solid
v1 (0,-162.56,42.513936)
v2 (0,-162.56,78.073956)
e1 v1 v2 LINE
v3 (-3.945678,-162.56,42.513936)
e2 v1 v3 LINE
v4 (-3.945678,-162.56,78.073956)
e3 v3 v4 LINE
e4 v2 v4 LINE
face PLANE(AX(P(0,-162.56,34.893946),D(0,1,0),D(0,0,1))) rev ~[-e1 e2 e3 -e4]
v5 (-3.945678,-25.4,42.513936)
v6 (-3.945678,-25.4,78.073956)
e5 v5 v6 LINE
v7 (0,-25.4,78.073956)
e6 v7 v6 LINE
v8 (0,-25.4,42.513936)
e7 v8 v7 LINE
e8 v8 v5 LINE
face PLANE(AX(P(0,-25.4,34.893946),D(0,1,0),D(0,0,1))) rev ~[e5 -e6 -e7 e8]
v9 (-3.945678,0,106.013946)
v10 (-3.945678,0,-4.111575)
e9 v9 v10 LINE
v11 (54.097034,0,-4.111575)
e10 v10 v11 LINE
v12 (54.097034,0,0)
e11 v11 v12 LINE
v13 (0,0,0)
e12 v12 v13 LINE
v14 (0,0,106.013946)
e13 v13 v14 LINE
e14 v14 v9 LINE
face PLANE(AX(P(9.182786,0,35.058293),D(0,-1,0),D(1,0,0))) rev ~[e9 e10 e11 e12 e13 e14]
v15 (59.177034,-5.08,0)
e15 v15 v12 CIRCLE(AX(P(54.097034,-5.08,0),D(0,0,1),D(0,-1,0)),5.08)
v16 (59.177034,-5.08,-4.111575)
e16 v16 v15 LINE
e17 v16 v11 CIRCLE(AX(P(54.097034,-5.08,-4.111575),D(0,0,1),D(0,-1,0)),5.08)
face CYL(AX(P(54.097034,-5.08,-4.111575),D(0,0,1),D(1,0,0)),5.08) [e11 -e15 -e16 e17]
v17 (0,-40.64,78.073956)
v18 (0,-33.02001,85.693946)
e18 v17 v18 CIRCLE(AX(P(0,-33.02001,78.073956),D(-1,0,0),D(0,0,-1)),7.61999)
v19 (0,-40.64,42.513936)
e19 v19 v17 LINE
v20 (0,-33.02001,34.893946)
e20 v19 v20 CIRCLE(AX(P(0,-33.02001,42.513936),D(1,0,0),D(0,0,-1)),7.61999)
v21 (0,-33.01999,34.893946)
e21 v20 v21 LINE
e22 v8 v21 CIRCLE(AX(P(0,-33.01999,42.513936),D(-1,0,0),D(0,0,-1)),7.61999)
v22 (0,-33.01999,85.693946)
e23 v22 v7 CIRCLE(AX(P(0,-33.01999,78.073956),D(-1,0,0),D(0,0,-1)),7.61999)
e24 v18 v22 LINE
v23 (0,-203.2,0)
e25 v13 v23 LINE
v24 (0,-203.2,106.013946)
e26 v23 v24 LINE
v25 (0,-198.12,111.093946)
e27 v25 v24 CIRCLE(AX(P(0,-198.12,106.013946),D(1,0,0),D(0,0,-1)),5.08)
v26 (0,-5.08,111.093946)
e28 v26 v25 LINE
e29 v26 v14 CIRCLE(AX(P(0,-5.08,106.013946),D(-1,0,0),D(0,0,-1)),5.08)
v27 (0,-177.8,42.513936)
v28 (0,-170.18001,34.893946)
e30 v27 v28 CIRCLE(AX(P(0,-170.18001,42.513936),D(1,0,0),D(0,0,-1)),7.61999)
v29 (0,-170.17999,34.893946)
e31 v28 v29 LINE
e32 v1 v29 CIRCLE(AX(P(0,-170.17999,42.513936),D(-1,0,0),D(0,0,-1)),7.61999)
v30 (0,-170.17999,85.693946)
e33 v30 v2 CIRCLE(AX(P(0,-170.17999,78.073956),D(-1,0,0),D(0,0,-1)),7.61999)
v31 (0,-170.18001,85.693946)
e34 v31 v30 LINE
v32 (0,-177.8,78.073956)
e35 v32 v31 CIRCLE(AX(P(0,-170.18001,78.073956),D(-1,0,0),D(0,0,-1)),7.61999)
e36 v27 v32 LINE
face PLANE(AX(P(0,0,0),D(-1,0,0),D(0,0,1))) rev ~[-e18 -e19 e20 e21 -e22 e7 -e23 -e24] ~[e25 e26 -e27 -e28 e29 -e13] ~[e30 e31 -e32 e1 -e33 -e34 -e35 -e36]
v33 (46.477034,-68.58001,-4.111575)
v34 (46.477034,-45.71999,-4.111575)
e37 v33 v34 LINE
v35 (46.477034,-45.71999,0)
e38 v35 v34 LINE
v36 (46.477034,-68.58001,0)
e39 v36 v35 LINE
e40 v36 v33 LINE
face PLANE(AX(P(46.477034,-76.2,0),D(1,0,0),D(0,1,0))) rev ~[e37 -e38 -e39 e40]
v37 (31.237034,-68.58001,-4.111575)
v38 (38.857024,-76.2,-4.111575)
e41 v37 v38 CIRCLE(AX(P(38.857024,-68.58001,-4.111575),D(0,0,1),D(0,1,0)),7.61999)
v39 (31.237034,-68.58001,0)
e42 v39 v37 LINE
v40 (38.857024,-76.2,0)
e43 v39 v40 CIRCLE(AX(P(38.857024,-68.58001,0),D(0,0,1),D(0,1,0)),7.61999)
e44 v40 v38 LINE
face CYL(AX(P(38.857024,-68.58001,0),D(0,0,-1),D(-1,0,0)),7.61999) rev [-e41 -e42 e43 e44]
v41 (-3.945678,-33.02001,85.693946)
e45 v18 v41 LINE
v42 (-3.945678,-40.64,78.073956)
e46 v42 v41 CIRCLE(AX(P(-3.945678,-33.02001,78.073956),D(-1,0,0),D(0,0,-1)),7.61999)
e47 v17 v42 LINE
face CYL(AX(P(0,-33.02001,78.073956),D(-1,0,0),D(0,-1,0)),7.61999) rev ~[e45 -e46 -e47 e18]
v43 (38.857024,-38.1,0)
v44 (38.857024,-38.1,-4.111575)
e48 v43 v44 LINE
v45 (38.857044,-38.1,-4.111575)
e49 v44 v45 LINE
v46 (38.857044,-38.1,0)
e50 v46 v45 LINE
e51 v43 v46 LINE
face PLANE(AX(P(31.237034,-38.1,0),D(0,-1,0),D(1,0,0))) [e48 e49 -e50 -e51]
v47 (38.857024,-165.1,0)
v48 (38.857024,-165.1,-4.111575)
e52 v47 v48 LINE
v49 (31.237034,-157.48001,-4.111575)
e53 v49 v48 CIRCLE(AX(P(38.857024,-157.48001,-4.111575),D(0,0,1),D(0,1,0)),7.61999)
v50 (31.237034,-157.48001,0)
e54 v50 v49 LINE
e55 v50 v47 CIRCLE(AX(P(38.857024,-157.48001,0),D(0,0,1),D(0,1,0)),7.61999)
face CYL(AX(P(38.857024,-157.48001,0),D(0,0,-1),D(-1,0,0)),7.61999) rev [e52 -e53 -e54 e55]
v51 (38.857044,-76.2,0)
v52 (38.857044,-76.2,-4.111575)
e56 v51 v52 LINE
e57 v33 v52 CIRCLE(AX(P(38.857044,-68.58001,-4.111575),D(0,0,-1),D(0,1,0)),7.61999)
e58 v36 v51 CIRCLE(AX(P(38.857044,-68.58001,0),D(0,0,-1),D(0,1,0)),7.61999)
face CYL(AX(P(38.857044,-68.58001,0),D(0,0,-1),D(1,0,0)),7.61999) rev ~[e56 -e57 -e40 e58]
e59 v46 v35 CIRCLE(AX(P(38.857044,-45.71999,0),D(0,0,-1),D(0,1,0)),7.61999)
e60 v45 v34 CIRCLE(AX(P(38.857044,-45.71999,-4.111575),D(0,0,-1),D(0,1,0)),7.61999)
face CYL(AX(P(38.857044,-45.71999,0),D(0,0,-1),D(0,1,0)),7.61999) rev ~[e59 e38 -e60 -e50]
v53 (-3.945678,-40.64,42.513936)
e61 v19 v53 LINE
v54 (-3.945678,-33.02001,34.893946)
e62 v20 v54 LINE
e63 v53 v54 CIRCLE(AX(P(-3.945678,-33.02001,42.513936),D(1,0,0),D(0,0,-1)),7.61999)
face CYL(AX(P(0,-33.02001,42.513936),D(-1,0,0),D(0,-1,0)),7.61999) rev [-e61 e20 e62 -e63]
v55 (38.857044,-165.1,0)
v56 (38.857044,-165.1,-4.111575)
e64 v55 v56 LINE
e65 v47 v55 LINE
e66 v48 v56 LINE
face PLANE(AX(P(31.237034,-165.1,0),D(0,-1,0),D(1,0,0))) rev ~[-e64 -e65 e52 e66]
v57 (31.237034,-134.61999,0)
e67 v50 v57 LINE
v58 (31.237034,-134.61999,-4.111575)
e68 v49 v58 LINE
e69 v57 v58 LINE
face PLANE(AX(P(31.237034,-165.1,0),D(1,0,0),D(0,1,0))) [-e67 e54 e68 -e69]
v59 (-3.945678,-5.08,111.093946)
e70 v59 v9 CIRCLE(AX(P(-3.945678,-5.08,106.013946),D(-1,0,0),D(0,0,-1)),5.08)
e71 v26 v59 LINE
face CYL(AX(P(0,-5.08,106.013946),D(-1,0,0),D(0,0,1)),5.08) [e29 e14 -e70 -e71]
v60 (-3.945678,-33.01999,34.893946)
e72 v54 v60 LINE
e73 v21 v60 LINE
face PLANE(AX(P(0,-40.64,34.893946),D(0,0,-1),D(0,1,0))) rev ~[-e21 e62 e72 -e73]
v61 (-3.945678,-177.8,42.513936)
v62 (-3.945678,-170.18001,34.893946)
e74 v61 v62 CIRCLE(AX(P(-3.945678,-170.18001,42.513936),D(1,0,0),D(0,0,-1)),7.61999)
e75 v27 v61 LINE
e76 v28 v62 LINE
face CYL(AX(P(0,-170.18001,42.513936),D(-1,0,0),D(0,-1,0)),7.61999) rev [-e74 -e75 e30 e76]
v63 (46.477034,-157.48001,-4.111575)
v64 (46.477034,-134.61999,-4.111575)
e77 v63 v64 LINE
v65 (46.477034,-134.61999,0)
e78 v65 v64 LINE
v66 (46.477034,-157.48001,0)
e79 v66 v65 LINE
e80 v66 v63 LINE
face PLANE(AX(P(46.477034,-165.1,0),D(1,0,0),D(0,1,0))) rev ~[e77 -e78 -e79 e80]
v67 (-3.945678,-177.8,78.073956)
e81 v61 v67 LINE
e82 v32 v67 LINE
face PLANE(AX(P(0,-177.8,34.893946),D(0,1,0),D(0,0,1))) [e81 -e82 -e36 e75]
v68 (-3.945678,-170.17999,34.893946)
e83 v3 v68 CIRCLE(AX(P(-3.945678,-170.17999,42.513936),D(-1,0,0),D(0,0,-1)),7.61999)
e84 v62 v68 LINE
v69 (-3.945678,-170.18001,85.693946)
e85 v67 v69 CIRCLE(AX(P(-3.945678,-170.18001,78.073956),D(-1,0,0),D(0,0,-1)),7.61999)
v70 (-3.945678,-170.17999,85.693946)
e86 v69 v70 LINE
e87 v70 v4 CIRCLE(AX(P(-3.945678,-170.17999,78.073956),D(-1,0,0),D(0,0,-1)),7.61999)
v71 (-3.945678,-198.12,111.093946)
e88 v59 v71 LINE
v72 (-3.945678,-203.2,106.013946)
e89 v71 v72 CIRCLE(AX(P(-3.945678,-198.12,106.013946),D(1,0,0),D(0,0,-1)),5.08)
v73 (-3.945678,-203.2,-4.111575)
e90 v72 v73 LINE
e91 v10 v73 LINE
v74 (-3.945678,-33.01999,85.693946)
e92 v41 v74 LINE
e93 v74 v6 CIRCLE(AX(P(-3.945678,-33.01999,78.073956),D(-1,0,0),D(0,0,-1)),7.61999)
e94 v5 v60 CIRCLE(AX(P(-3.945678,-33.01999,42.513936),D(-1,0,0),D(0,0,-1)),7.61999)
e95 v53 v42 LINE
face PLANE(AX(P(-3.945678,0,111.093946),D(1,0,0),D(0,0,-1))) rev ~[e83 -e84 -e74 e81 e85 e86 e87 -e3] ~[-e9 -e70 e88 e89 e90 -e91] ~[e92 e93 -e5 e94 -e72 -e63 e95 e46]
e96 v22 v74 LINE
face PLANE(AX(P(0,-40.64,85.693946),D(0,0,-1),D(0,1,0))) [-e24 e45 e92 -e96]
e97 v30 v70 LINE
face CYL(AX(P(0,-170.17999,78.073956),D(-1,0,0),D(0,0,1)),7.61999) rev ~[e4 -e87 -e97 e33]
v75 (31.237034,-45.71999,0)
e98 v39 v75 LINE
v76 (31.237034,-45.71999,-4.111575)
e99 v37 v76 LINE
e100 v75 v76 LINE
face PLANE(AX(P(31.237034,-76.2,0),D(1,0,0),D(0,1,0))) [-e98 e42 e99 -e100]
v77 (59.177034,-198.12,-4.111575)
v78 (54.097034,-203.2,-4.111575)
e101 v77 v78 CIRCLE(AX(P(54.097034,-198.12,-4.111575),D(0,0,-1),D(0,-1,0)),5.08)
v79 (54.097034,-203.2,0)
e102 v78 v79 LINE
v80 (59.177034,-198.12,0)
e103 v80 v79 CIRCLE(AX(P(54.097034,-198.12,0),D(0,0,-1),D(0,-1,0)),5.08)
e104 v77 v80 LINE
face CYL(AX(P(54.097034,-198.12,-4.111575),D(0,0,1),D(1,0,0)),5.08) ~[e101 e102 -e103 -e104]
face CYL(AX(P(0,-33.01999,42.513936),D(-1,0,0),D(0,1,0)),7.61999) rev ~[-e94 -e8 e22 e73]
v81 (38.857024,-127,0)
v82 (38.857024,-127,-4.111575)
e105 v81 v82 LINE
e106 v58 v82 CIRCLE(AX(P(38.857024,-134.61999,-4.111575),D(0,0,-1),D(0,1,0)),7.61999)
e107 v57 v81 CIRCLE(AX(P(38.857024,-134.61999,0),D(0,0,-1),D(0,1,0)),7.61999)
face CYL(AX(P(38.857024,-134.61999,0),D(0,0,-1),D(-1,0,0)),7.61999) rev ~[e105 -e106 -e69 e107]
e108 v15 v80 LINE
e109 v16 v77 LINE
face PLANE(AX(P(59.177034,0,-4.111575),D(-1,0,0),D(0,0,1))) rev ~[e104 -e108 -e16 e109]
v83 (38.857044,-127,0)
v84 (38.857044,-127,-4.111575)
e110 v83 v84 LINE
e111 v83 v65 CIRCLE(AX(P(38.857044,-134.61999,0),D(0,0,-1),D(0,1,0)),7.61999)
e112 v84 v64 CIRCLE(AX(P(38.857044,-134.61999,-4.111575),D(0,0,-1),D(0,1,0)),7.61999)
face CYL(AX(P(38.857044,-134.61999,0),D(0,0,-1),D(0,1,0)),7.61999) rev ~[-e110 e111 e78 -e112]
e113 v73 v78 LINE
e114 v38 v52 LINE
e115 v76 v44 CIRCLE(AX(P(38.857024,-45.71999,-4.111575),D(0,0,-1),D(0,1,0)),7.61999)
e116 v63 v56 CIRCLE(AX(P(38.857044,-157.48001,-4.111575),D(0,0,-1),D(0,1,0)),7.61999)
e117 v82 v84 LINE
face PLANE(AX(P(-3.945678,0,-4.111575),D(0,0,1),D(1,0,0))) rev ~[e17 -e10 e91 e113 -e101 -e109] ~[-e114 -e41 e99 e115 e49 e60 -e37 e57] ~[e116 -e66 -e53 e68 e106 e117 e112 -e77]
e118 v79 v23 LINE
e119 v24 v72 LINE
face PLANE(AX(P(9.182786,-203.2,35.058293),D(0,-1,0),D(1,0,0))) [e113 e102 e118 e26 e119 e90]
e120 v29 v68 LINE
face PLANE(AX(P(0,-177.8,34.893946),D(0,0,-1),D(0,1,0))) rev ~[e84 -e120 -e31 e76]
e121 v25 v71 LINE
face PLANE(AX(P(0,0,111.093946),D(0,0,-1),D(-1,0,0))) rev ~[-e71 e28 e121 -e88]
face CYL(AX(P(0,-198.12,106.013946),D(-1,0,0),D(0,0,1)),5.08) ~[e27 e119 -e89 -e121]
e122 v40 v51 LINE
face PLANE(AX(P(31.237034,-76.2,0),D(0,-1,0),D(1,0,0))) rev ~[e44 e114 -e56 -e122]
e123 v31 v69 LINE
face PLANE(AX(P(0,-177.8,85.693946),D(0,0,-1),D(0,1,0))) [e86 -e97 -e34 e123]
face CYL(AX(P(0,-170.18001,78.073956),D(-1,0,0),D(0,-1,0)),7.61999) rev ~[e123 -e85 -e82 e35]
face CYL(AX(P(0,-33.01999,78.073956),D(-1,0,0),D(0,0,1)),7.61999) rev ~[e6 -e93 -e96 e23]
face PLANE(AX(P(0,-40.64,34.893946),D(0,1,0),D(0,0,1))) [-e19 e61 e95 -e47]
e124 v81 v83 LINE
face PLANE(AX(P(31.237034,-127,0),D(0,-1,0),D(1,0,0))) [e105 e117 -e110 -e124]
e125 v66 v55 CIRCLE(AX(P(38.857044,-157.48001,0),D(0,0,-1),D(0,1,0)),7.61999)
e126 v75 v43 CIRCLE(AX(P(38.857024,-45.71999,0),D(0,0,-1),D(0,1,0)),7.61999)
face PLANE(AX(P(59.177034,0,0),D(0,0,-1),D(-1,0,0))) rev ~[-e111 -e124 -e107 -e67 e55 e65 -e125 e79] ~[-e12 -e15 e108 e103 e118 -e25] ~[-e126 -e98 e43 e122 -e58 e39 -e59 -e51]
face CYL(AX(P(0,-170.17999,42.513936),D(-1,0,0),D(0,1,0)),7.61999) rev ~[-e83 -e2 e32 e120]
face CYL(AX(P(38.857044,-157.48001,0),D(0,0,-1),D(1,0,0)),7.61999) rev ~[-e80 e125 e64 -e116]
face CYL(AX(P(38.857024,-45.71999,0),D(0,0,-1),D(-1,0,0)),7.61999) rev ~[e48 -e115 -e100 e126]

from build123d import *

# Parameters (mm, degrees)
F1_DEPTH = 203.2
F2_R     = 5.08
F3_W     = 15.24
F3_H     = 50.8
F4_DEPTH = 3.9456780069
F5_R     = 7.61999
F6_W     = 15.24
F6_H     = 38.1
F7_DEPTH = 4.1115754284
F8_R     = 7.61999


# Not quite as in the source:
# - a fillet or chamfer is up to 0.001 mm smaller than in the source, because OpenCascade refuses the exact size


with BuildPart() as f1:
    # F0 (on Front) → F1 (new body)
    with BuildSketch(Plane.XZ):
        Polygon((59.1770336032, 0), (0, 0), (0, 111.0939458013), (-3.9456780069, 111.0939458013), (-3.9456780069, -4.1115754284), (59.1770336032, -4.1115754284), align=None)
    extrude(amount=F1_DEPTH)

    # F2
    f2_edges = [f1.edges().sort_by_distance(p)[0] for p in [
        (-1.972839, -203.2, 111.093946),
        (59.177034, -203.2, -2.055788),
        (59.177034, 0, -2.055788),
        (-1.972839, 0, 111.093946),
    ]]
    fillet(f2_edges, radius=F2_R)

    # F3 (on face) → F4 (cut, through all)
    with BuildSketch(Plane.YZ):
        with Locations((-170.18, 60.2939458013)):
            Rectangle(F3_W, F3_H)
        with Locations((-33.02, 60.2939458013)):
            Rectangle(F3_W, F3_H)
    extrude(amount=-F4_DEPTH, mode=Mode.SUBTRACT)

    # F5 (radius 7.62 in the source; OpenCascade refuses exactly that, so slightly less here)
    f5_edges = [f1.edges().sort_by_distance(p)[0] for p in [
        (-1.972839, -177.8, 34.893946),
        (-1.972839, -162.56, 34.893946),
        (-1.972839, -177.8, 85.693946),
        (-1.972839, -162.56, 85.693946),
        (-1.972839, -40.64, 85.693946),
        (-1.972839, -25.4, 85.693946),
        (-1.972839, -40.64, 34.893946),
        (-1.972839, -25.4, 34.893946),
    ]]
    fillet(f5_edges, radius=F5_R)

    # F6 (on face) → F7 (cut, through all)
    with BuildSketch(Plane.XY):
        with Locations((38.8570336032, -146.05)):
            Rectangle(F6_W, F6_H)
        with Locations((38.8570336032, -57.15)):
            Rectangle(F6_W, F6_H)
    extrude(amount=-F7_DEPTH, mode=Mode.SUBTRACT)

    # F8 (radius 7.62 in the source; OpenCascade refuses exactly that, so slightly less here)
    f8_edges = [f1.edges().sort_by_distance(p)[0] for p in [
        (31.237034, -165.1, -2.055788),
        (46.477034, -165.1, -2.055788),
        (31.237034, -127, -2.055788),
        (46.477034, -127, -2.055788),
        (46.477034, -38.1, -2.055788),
        (46.477034, -76.2, -2.055788),
        (31.237034, -76.2, -2.055788),
        (31.237034, -38.1, -2.055788),
    ]]
    fillet(f8_edges, radius=F8_R)


solid = f1.part
